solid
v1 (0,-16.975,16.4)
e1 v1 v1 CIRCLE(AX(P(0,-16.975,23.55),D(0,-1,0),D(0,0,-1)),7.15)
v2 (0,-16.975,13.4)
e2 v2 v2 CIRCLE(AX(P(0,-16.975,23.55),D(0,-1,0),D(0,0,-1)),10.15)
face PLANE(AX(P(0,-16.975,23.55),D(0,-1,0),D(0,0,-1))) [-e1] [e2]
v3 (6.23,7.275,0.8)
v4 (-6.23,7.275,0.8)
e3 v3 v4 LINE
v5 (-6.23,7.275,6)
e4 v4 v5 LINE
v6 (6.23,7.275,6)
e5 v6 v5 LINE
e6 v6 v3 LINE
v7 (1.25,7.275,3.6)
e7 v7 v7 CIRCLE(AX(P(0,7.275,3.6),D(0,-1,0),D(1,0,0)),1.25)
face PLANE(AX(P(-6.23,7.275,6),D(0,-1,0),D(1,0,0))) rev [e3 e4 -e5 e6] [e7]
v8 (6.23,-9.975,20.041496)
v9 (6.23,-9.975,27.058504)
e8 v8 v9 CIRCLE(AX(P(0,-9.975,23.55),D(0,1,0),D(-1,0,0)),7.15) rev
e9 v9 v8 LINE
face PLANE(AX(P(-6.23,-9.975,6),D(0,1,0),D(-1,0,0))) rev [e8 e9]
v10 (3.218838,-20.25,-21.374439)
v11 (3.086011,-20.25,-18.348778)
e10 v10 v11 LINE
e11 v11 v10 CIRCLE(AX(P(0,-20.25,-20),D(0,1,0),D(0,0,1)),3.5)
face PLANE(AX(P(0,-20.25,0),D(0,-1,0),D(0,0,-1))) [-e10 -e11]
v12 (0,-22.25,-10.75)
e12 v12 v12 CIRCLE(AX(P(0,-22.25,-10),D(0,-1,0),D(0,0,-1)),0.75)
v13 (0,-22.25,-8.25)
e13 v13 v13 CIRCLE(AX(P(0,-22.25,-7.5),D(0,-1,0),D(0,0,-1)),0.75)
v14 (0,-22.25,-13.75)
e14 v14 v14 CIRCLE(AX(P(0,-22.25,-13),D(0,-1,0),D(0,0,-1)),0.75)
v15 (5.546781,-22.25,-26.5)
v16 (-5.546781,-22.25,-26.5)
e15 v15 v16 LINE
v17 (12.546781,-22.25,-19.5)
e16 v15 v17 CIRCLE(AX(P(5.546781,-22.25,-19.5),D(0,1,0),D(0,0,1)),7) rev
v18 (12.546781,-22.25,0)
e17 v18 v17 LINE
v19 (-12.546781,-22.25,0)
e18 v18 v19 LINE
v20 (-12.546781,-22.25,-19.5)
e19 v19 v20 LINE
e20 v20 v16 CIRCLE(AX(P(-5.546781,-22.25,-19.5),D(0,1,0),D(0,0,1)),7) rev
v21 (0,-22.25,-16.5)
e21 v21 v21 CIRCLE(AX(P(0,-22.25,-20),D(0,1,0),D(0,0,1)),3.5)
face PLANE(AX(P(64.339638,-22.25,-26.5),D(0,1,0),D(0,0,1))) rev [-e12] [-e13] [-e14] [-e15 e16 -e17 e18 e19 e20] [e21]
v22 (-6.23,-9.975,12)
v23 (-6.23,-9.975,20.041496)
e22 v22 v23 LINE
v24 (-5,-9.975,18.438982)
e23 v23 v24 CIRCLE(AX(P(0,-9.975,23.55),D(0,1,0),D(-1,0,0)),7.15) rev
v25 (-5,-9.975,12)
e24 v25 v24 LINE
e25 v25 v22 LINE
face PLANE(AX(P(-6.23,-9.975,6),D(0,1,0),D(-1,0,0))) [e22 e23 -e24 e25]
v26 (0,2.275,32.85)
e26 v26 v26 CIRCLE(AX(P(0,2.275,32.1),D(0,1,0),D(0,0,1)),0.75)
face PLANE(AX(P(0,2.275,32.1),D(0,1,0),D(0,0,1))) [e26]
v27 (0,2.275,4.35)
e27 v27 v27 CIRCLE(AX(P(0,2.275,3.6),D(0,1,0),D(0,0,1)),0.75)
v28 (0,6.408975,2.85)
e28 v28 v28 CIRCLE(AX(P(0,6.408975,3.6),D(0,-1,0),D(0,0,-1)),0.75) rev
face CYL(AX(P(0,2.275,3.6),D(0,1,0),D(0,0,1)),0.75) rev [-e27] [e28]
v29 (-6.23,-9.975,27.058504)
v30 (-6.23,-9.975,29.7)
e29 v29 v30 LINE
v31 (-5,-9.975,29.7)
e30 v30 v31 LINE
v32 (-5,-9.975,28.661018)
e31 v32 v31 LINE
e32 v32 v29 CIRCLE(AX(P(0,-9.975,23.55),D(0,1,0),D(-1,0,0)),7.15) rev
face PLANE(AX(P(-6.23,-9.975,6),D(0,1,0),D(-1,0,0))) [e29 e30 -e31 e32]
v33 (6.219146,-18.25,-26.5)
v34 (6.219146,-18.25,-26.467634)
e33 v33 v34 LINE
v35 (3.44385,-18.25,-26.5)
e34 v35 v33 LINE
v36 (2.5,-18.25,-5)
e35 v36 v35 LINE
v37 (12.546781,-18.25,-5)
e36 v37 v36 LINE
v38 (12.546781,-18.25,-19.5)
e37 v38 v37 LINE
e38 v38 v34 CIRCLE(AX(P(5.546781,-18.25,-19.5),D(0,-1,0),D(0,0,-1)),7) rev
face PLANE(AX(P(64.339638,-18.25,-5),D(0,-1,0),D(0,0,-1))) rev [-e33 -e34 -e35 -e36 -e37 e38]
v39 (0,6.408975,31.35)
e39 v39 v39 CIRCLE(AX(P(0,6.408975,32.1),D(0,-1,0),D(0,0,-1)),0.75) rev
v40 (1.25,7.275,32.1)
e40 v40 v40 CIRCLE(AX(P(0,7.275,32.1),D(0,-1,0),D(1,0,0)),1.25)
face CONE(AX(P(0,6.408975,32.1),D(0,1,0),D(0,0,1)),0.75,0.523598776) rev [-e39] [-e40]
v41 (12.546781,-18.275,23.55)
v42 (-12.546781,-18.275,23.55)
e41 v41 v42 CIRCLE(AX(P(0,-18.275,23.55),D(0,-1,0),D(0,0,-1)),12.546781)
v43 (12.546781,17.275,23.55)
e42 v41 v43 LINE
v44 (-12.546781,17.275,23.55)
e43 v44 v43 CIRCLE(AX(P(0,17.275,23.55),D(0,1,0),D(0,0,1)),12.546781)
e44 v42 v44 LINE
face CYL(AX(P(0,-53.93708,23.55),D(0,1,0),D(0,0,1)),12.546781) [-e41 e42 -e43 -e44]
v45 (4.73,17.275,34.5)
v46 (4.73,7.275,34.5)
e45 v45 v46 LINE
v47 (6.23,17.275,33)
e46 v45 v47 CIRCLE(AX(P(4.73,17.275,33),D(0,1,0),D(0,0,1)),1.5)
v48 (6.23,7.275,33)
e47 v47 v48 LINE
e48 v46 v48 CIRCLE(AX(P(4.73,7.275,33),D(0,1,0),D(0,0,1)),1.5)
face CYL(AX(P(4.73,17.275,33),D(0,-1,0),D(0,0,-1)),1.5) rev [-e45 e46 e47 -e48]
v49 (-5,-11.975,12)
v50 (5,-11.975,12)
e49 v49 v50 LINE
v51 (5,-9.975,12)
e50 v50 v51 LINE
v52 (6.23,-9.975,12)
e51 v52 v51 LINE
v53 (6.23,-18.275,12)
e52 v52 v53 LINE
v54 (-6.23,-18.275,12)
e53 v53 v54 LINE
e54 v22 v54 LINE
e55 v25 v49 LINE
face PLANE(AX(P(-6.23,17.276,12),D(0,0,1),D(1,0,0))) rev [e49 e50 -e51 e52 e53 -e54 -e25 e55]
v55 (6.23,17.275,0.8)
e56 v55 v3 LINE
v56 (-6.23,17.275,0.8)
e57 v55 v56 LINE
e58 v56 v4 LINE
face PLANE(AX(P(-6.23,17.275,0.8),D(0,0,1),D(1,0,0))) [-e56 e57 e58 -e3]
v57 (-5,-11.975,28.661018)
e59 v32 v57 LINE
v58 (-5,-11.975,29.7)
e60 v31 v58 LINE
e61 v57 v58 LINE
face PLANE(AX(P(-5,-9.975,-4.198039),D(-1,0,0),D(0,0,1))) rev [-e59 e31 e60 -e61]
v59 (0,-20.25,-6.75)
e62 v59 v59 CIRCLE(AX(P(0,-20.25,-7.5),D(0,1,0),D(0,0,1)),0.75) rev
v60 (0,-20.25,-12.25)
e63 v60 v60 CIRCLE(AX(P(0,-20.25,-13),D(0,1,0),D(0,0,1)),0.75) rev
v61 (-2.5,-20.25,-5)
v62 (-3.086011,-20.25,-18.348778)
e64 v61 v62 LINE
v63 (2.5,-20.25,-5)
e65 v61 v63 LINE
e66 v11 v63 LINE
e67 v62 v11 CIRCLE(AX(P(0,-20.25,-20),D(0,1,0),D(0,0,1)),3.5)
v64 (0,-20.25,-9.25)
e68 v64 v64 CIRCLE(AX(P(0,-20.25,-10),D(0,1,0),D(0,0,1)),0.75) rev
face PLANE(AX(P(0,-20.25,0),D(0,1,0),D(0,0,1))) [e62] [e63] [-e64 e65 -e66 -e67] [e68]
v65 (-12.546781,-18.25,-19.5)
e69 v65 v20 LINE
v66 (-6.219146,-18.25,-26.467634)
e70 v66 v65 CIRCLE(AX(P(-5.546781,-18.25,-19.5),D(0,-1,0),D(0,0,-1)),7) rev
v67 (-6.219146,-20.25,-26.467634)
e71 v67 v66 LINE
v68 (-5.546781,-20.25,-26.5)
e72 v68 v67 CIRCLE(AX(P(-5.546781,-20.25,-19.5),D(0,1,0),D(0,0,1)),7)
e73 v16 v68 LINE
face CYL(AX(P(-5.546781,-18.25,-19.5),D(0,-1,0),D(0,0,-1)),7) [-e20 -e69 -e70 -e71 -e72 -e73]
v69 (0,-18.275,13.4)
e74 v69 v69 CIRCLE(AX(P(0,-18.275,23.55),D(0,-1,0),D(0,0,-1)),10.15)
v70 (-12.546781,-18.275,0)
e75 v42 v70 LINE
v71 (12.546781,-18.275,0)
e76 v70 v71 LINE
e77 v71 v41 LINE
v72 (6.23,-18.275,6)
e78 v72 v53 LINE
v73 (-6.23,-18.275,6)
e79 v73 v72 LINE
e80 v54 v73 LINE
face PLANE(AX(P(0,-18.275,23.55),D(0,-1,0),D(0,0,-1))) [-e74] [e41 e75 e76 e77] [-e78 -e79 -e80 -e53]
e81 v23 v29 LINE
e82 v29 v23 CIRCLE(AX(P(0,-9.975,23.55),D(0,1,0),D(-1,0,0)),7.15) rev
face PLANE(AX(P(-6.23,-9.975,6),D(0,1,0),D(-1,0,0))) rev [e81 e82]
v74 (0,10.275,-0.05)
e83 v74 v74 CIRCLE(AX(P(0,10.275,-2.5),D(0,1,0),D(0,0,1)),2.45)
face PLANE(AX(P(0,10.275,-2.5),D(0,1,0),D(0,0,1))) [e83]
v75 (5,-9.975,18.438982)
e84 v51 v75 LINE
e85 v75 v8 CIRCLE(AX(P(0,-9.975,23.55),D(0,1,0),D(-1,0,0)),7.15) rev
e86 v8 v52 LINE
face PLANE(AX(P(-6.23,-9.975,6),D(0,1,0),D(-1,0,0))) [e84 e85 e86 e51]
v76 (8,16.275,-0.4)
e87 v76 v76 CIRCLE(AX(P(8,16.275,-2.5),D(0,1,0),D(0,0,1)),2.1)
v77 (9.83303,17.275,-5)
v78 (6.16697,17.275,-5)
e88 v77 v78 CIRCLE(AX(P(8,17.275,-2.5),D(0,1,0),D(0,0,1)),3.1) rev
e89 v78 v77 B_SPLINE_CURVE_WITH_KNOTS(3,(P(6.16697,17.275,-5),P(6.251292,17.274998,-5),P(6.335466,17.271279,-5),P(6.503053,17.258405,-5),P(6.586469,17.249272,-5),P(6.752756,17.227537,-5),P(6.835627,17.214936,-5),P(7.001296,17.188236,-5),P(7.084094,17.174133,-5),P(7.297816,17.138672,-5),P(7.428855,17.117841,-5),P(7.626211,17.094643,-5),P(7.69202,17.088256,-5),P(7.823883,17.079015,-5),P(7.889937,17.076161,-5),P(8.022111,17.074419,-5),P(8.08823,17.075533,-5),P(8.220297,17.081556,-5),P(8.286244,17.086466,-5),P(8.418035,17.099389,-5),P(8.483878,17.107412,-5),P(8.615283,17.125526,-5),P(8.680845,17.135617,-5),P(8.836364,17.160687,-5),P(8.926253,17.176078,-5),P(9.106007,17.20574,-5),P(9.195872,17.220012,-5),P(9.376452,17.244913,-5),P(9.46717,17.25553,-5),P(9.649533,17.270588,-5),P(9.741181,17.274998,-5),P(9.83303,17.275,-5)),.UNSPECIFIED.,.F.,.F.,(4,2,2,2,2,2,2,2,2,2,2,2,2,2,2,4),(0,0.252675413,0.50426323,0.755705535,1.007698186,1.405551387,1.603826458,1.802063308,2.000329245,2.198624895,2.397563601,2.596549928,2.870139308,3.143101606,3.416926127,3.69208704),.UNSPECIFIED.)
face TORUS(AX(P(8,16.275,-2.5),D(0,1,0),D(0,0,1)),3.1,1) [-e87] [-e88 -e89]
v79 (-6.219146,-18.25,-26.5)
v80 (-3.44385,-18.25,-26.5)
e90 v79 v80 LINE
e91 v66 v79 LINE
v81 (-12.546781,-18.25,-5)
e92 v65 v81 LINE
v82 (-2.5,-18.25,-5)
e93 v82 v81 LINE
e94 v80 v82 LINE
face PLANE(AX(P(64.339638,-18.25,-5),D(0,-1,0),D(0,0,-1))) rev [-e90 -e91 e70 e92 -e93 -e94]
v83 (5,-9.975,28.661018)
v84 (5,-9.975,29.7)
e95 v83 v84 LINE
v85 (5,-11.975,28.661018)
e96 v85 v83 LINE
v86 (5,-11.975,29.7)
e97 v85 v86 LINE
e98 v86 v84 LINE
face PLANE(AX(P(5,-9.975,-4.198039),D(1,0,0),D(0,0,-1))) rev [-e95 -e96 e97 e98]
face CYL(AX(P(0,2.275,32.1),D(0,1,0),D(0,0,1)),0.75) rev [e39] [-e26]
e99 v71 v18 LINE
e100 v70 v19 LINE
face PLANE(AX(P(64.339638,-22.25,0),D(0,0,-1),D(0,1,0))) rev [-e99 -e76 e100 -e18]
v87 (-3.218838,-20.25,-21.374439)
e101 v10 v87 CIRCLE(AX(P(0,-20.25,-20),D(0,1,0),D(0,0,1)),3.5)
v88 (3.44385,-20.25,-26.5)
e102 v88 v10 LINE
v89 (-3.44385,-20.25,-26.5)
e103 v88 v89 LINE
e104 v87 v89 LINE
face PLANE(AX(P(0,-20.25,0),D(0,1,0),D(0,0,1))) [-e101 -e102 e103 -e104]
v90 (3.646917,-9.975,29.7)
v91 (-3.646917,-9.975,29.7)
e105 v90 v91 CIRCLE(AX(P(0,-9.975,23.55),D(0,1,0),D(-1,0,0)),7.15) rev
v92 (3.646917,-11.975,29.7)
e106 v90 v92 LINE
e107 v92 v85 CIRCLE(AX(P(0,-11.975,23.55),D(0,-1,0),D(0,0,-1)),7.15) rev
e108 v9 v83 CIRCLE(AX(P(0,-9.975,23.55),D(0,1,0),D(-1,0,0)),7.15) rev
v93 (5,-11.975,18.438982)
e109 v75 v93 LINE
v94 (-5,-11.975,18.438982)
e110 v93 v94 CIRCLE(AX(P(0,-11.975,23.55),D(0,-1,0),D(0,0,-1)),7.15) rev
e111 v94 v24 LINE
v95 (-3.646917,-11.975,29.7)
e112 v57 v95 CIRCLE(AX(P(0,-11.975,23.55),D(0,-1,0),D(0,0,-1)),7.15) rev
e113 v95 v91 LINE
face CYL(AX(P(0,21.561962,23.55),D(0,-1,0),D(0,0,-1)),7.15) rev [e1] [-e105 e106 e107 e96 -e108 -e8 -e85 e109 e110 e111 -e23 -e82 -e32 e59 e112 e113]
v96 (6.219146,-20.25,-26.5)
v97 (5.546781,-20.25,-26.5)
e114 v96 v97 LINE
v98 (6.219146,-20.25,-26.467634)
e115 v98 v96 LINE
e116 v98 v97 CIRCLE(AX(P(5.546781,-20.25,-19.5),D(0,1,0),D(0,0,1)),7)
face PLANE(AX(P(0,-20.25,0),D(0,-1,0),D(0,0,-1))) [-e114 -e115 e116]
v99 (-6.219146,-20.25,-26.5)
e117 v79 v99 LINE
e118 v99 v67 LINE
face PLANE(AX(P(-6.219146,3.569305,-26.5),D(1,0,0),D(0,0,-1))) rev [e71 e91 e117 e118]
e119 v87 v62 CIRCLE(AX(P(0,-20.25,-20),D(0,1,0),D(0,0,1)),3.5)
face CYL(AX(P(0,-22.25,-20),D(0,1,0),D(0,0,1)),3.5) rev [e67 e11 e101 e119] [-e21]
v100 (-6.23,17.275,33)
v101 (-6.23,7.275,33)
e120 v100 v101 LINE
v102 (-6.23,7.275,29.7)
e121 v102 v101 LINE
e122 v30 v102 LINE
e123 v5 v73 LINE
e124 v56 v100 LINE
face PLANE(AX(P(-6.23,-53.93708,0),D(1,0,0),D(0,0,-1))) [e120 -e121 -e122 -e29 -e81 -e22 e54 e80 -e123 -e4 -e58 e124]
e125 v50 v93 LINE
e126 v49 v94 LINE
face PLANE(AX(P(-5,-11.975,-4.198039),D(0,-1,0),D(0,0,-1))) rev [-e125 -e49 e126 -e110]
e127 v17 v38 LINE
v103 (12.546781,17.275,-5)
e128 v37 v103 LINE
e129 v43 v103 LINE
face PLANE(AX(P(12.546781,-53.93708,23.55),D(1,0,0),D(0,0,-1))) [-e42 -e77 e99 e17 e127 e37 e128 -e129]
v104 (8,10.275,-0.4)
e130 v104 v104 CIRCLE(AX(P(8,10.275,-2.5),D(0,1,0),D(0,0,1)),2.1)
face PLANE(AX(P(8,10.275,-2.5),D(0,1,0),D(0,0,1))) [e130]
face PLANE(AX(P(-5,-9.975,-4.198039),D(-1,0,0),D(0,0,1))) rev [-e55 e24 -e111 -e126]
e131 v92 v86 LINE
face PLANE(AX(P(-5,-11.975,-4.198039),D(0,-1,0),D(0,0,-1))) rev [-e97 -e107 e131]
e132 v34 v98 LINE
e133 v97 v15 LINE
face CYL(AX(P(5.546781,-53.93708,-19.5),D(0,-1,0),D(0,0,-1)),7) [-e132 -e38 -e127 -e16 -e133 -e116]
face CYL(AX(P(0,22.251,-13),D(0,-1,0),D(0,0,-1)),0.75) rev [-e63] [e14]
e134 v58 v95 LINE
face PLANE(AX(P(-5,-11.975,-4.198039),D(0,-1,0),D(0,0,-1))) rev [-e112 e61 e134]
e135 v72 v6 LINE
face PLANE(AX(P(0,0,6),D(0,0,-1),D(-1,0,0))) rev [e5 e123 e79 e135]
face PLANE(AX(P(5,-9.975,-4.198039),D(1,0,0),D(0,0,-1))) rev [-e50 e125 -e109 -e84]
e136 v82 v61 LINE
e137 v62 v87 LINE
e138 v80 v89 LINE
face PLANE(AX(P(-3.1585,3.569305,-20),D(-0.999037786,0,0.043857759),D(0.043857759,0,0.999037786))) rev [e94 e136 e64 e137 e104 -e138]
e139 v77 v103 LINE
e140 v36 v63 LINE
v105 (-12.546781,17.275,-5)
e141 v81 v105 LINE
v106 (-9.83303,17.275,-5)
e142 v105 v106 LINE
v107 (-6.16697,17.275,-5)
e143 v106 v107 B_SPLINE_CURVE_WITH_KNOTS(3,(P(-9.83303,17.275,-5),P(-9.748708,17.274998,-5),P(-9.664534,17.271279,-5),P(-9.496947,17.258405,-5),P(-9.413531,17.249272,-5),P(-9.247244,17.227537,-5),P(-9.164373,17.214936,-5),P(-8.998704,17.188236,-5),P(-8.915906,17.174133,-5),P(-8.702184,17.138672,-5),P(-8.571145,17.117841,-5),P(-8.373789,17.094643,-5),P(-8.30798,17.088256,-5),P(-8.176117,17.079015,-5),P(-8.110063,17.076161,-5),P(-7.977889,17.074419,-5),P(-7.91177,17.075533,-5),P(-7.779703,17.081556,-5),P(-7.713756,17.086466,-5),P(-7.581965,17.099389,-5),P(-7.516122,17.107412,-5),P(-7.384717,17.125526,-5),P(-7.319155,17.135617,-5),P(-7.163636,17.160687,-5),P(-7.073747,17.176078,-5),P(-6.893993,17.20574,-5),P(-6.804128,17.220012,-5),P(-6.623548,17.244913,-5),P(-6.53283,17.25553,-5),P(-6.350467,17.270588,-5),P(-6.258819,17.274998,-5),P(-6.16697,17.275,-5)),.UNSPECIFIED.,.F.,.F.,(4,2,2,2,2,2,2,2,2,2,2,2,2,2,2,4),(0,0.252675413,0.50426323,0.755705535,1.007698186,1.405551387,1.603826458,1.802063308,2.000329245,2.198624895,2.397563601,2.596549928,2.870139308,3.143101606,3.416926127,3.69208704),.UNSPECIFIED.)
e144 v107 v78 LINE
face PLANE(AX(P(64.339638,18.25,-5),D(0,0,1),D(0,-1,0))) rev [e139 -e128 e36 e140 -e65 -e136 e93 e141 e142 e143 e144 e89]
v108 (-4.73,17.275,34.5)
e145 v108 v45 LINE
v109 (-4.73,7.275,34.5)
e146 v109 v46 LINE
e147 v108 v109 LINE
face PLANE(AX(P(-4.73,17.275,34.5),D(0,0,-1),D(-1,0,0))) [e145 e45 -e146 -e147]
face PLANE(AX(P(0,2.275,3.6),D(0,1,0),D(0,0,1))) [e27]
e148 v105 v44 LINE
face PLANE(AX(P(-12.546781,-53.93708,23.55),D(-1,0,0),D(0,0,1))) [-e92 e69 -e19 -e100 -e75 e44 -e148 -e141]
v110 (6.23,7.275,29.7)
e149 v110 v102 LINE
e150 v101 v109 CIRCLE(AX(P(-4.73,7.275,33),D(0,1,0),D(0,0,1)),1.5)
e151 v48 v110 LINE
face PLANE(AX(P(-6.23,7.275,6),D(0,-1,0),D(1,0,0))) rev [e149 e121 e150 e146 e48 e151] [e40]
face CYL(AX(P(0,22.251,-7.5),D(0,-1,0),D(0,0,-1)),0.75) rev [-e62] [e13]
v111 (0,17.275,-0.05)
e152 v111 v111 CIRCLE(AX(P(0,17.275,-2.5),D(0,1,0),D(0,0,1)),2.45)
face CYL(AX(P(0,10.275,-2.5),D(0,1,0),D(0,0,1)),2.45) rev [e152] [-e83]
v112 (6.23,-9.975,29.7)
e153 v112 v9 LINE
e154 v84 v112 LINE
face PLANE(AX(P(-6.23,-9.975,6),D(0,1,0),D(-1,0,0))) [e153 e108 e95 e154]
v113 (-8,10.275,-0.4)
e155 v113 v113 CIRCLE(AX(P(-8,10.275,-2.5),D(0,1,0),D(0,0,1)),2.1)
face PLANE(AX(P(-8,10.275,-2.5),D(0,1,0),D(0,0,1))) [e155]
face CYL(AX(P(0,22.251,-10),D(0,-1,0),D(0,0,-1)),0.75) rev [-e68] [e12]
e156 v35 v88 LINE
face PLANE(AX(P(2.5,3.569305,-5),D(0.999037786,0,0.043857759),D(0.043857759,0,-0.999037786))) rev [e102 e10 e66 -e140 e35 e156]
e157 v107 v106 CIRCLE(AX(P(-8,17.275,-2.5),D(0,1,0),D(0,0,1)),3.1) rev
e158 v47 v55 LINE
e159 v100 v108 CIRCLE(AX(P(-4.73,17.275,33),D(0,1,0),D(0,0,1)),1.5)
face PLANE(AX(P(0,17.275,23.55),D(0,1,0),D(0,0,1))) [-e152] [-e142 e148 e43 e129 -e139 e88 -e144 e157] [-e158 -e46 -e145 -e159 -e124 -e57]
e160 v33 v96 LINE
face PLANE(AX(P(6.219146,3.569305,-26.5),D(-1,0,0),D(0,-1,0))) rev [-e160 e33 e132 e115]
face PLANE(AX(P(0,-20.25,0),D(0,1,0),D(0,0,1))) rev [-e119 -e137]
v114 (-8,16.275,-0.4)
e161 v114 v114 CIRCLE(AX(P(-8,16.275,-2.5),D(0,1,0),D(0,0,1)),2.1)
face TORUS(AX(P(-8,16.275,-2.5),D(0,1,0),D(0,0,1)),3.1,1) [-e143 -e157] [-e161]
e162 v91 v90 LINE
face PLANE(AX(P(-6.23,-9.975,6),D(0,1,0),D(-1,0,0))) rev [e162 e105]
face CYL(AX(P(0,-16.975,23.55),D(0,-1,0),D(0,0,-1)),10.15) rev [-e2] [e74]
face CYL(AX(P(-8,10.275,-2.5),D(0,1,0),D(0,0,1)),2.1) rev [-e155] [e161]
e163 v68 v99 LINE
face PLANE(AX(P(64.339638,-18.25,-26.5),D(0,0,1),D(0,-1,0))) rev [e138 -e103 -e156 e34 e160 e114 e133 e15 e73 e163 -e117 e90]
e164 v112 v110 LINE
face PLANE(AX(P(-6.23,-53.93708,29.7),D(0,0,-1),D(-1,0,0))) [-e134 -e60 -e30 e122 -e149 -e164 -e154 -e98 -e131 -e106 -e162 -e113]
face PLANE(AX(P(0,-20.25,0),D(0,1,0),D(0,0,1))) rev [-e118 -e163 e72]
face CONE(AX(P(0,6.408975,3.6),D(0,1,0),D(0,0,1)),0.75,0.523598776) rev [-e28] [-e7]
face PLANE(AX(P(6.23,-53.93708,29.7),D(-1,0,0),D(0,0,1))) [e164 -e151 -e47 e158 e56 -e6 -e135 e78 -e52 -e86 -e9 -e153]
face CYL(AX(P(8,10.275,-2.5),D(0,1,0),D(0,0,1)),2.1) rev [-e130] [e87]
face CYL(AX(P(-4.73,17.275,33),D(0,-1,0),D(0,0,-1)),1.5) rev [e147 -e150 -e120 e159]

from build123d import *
from OCP.BRepFilletAPI import BRepFilletAPI_MakeChamfer

# Parameters (mm, degrees)
SKETCH4_W                = 12.46
SKETCH4_H                = 17.25
BOSS_EXTRUDE3_DEPTH      = 6
BOSS_EXTRUDE6_DEPTH      = 8.3
BOSS_EXTRUDE6_DEPTH_BACK = 17.25
SKETCH8_R                = 12.546781182
SKETCH8_R_2              = 11.15
BOSS_EXTRUDE4_DEPTH      = 17.25
SKETCH6_R                = 0.75
CUT_EXTRUDE1_DEPTH       = 5
CHAMFER1_SIZE            = 0.5
CHAMFER1_SIZE2           = 0.866025404
SKETCH10_W               = 12.46
SKETCH10_H               = 23.7
CUT_EXTRUDE3_DEPTH       = 17.25
BOSS_EXTRUDE7_START      = -8.3
BOSS_EXTRUDE7_DEPTH      = 8.3
BOSS_EXTRUDE9_START      = 10
BOSS_EXTRUDE9_DEPTH      = 10
BOSS_EXTRUDE11_START     = -8.3
SKETCH20_R               = 11.15
SKETCH20_R_2             = 7.15
BOSS_EXTRUDE11_DEPTH     = 8.3
CUT_EXTRUDE7_START       = -1.3
SKETCH21_R               = 10.15
SKETCH21_R_2             = 7.15
CUT_EXTRUDE7_DEPTH       = 1.3
CUT_EXTRUDE4_REACH       = 39.061
SKETCH11_W               = 10
SKETCH11_H               = 2
CUT_EXTRUDE8_REACH       = 54.194
SKETCH24_W               = 12.46
SKETCH24_H               = 6
BOSS_EXTRUDE10_DEPTH     = 25.093562364
SKETCH18_W               = 21.5
SKETCH18_H               = 12.438292938
CUT_EXTRUDE5_DEPTH       = 2
CUT_EXTRUDE6_DEPTH       = 58.154608998
CUT_EXTRUDE6_DEPTH_BACK  = 58.154608998
SKETCH19_R               = 3.5
FILLET1_R                = 7
SKETCH22_R               = 6.5
BOSS_EXTRUDE12_DEPTH     = 5
SKETCH23_R               = 6.075
BOSS_EXTRUDE13_DEPTH     = 5
FILLET2_R                = 1
BOSS_EXTRUDE15_DEPTH     = 2
CUT_EXTRUDE9_REACH       = 60.657
SKETCH26_R               = 0.75
CUT_EXTRUDE10_DEPTH      = 50.271969555
SKETCH28_R               = 2.1
SKETCH28_R_2             = 2.45
CUT_EXTRUDE11_DEPTH      = 7
FILLET3_R                = 1


with BuildPart() as part:
    # Sketch4 → Boss-Extrude3 (new body)
    with BuildSketch(Plane.XY):
        with Locations((0, -1.35)):
            Rectangle(SKETCH4_W, SKETCH4_H)
    extrude(amount=BOSS_EXTRUDE3_DEPTH)



with BuildPart() as body_2:
    # Sketch8 → Boss-Extrude6 (new, two sides: drawn at the far end of the back side and taken through both)
    with BuildSketch(Plane(origin=(0, -9.975, 0), x_dir=(-1, 0, 0), z_dir=(0, -1, 0)).offset(-BOSS_EXTRUDE6_DEPTH_BACK)):
        with Locations(Location((0, -23.55, 0), (0, 0, 90))):
            Circle(SKETCH8_R)
        with Locations(Location((0, -23.55, 0), (0, 0, 90))):
            Circle(SKETCH8_R_2, mode=Mode.SUBTRACT)
    extrude(amount=BOSS_EXTRUDE6_DEPTH + BOSS_EXTRUDE6_DEPTH_BACK)


with BuildPart() as part_1:
    add(part.part)

    add(body_2.part)  # Boss-Extrude4 merges body 2
    # Sketch5 → Boss-Extrude4 (add)
    with BuildSketch(Plane(origin=(0, 7.275, 0), x_dir=(1, 0, 0), z_dir=(0, 1, 0))):
        with BuildLine():
            Line((12.546781182, -23.55), (12.546781182, 0))
            Line((12.546781182, 0), (6.23, 0))
            Line((6.23, 0), (6.23, -29.7))
            Line((6.23, -29.7), (-6.23, -29.7))
            Line((-6.23, -29.7), (-6.23, 0))
            Line((-6.23, 0), (-12.546781182, 0))
            Line((-12.546781182, 0), (-12.546781182, -23.55))
            ThreePointArc((-12.546781182, -23.55), (0, -36.096781182), (12.546781182, -23.55))
        make_face()
    extrude(amount=-BOSS_EXTRUDE4_DEPTH)

    # Sketch6 → Cut-Extrude1 (cut)
    with BuildSketch(Plane(origin=(0, 7.275, 0), x_dir=(1, 0, 0), z_dir=(0, 1, 0))):
        with Locations(Location((0, -3.6, 0), (0, 0, 270))):
            Circle(SKETCH6_R)
        with Locations(Location((0, -32.1, 0), (0, 0, 270))):
            Circle(SKETCH6_R)
    extrude(amount=-CUT_EXTRUDE1_DEPTH, mode=Mode.SUBTRACT)

    # Chamfer1: one chamfer whose edges measure the first distance from different faces: ONE call of the kernel's chamfer builder (chamfer() names one face for all edges)
    chamfer1_edges_1 = [part_1.edges().sort_by_distance(p)[0] for p in [
        (0, 7.275, 2.85),
    ]]
    chamfer1_side_1 = [part_1.faces().sort_by_distance(p)[0] for p in [
        (12.202646125, 7.275, 11.775),
    ]]
    chamfer1_edges_2 = [part_1.edges().sort_by_distance(p)[0] for p in [
        (0, 7.275, 31.35),
    ]]
    chamfer1_side_2 = [part_1.faces().sort_by_distance(p)[0] for p in [
        (6.532214051, 7.275, 22.001429951),
    ]]
    chamfer1 = BRepFilletAPI_MakeChamfer(part_1.part.solid().wrapped)
    for e in chamfer1_edges_1:
        chamfer1.Add(CHAMFER1_SIZE, CHAMFER1_SIZE2, e.wrapped, chamfer1_side_1[0].wrapped)  # the first distance lies on this face
    for e in chamfer1_edges_2:
        chamfer1.Add(CHAMFER1_SIZE, CHAMFER1_SIZE2, e.wrapped, chamfer1_side_2[0].wrapped)  # the first distance lies on this face
    add(Compound.cast(chamfer1.Shape()), mode=Mode.REPLACE)

    # Sketch10 → Cut-Extrude3 (cut)
    with BuildSketch(Plane(origin=(0, 7.275, 0), x_dir=(1, 0, 0), z_dir=(0, 1, 0))):
        with Locations((0, -17.85)):
            Rectangle(SKETCH10_W, SKETCH10_H)
    extrude(amount=-CUT_EXTRUDE3_DEPTH, mode=Mode.SUBTRACT)

    # Sketch13 → Boss-Extrude7 (add)
    with BuildSketch(Plane.XZ.offset(18.275).offset(BOSS_EXTRUDE7_START)):
        with BuildLine():
            Line((-12.546781182, 23.55), (-12.546781182, 0))
            Line((-12.546781182, 0), (12.546781182, 0))
            Line((12.546781182, 0), (12.546781182, 23.55))
            ThreePointArc((12.546781182, 23.55), (0, 11.003218818), (-12.546781182, 23.55))
        make_face()
    extrude(amount=BOSS_EXTRUDE7_DEPTH)

    # Sketch15 → Boss-Extrude9 (add)
    with BuildSketch(Plane(origin=(0, 7.275, 0), x_dir=(1, 0, 0), z_dir=(0, 1, 0)).offset(BOSS_EXTRUDE9_START)):
        with BuildLine():
            Line((-12.546781182, 0), (12.546781182, 0))
            Line((12.546781182, 0), (12.546781182, -23.55))
            ThreePointArc((12.546781182, -23.55), (0, -36.096781182), (-12.546781182, -23.55))
            Line((-12.546781182, -23.55), (-12.546781182, 0))
        make_face()
        with BuildLine():
            Line((-6.23, -0.8), (6.23, -0.8))
            Line((6.23, -0.8), (6.23, -33))
            ThreePointArc((6.23, -33), (5.790660172, -34.060660172), (4.73, -34.5))
            Line((4.73, -34.5), (-4.73, -34.5))
            ThreePointArc((-4.73, -34.5), (-5.790660172, -34.060660172), (-6.23, -33))
            Line((-6.23, -33), (-6.23, -0.8))
        make_face(mode=Mode.SUBTRACT)
    extrude(amount=-BOSS_EXTRUDE9_DEPTH)

    # Sketch20 → Boss-Extrude11 (add)
    with BuildSketch(Plane.XZ.offset(18.275).offset(BOSS_EXTRUDE11_START)):
        with Locations((0, 23.55)):
            Circle(SKETCH20_R)
        with Locations(Location((0, 23.55, 0), (0, 0, 270))):
            Circle(SKETCH20_R_2, mode=Mode.SUBTRACT)
    extrude(amount=BOSS_EXTRUDE11_DEPTH)

    # Sketch21 → Cut-Extrude7 (cut)
    with BuildSketch(Plane.XZ.offset(18.275).offset(CUT_EXTRUDE7_START)):
        with Locations(Location((0, 23.55, 0), (0, 0, 270))):
            Circle(SKETCH21_R)
        with Locations(Location((0, 23.55, 0), (0, 0, 270))):
            Circle(SKETCH21_R_2, mode=Mode.SUBTRACT)
    extrude(amount=CUT_EXTRUDE7_DEPTH, mode=Mode.SUBTRACT)

    # Cut-Extrude4: up to this face of the body (flat: up to its plane)
    cut_extrude4_end = Plane(part_1.part.faces().sort_by_distance((0, -1.35, 6))[0])
    # Sketch11 → Cut-Extrude4 (cut, up to the picked face)
    with BuildSketch(Plane.XY.offset(29.7), mode=Mode.PRIVATE) as cut_extrude4_sk1:
        with Locations((0, -10.975)):
            Rectangle(SKETCH11_W, SKETCH11_H)
    cut_extrude4_tool1 = split(extrude(cut_extrude4_sk1.sketch, amount=-CUT_EXTRUDE4_REACH, mode=Mode.PRIVATE), bisect_by=cut_extrude4_end, keep=Keep.BOTH, mode=Mode.PRIVATE)
    add(cut_extrude4_tool1.solids().sort_by(Axis((0, -10.975, 29.7), (0, 0, -1)))[0], mode=Mode.SUBTRACT)

    # Sketch24 → Cut-Extrude8 (cut, up to next)
    with BuildSketch(Plane.XZ.offset(18.275), mode=Mode.PRIVATE) as cut_extrude8_sk1:
        with Locations((0, 9)):
            Rectangle(SKETCH24_W, SKETCH24_H)
    cut_extrude8_tool1 = extrude(cut_extrude8_sk1.sketch, amount=-CUT_EXTRUDE8_REACH, mode=Mode.PRIVATE) & part_1.part
    add(cut_extrude8_tool1.solids().sort_by_distance((0, -18.275, 9))[0], mode=Mode.SUBTRACT)

    # Sketch17 → Boss-Extrude10 (add)
    with BuildSketch(Plane(origin=(-12.546781182, 4.728218818, 0), x_dir=(0, -1, 0), z_dir=(1, 0, 0))):
        Polygon((26.978218818, 26.5), (26.978218818, 0), (-17.521781182, 0), (-17.521781182, 26.5), (-13.521781182, 26.5), (-13.521781182, 5), (22.978218818, 5), (22.978218818, 26.5), align=None)
    extrude(amount=BOSS_EXTRUDE10_DEPTH)

    # Sketch18 → Cut-Extrude5 (cut)
    with BuildSketch(Plane.ZX.offset(-18.25)):
        with Locations((-15.75, 0)):
            Rectangle(SKETCH18_W, SKETCH18_H)
    extrude(amount=-CUT_EXTRUDE5_DEPTH, mode=Mode.SUBTRACT)

    # Sketch19 → Cut-Extrude6 (cut, two sides: drawn at the far end of the back side and taken through both)
    with BuildSketch(Plane.ZX.offset(-20.25).offset(-CUT_EXTRUDE6_DEPTH_BACK)):
        with Locations((-20, 0)):
            Circle(SKETCH19_R)
    extrude(amount=CUT_EXTRUDE6_DEPTH + CUT_EXTRUDE6_DEPTH_BACK, mode=Mode.SUBTRACT)

    # Fillet1
    fillet1_edges = [part_1.edges().sort_by_distance(p)[0] for p in [
        (12.546781182, -20.25, -26.5),
        (-12.546781182, -20.25, -26.5),
        (12.546781182, 20.25, -26.5),
        (-12.546781182, 20.25, -26.5),
    ]]
    fillet(fillet1_edges, radius=FILLET1_R)

    # Sketch22 → Boss-Extrude12 (add)
    with BuildSketch(Plane(origin=(0, 22.25, 0), x_dir=(1, 0, 0), z_dir=(0, 1, 0))):
        with Locations(Location((0, 20, 0), (0, 0, 270))):
            Circle(SKETCH22_R)
    extrude(amount=-BOSS_EXTRUDE12_DEPTH)

    # Sketch23 → Boss-Extrude13 (add)
    with BuildSketch(Plane.XZ.offset(-17.25)):
        with Locations(Location((0, -20, 0), (0, 0, 270))):
            Circle(SKETCH23_R)
    extrude(amount=BOSS_EXTRUDE13_DEPTH)

    # Fillet2
    fillet2_edges = [part_1.edges().sort_by_distance(p)[0] for p in [
        (0, 12.25, -13.925),
    ]]
    fillet(fillet2_edges, radius=FILLET2_R)

    # Sketch25 → Boss-Extrude15 (add)
    with BuildSketch(Plane(origin=(0, -20.25, 0), x_dir=(1, 0, 0), z_dir=(0, 1, 0))):
        Polygon((-6.219146469, 5), (-2.5, 5), (-3.1585, 20), (-3.44385, 26.5), (-6.219146469, 26.5), align=None)
        Polygon((6.219146469, 5), (2.5, 5), (3.1585, 20), (3.44385, 26.5), (6.219146469, 26.5), align=None)
    extrude(amount=BOSS_EXTRUDE15_DEPTH)

    # Sketch26 → Cut-Extrude9 (cut, up to next)
    with BuildSketch(Plane(origin=(0, -22.25, 0), x_dir=(-1, 0, 0), z_dir=(0, -1, 0)), mode=Mode.PRIVATE) as cut_extrude9_sk1:
        with Locations(Location((0, 10, 0), (0, 0, 90))):
            Circle(SKETCH26_R)
    cut_extrude9_tool1 = extrude(cut_extrude9_sk1.sketch, amount=-CUT_EXTRUDE9_REACH, mode=Mode.PRIVATE) & part_1.part
    # Sketch26 → Cut-Extrude9 (cut, up to next)
    with BuildSketch(Plane(origin=(0, -22.25, 0), x_dir=(-1, 0, 0), z_dir=(0, -1, 0)), mode=Mode.PRIVATE) as cut_extrude9_sk2:
        with Locations(Location((0, 13, 0), (0, 0, 90))):
            Circle(SKETCH26_R)
    cut_extrude9_tool2 = extrude(cut_extrude9_sk2.sketch, amount=-CUT_EXTRUDE9_REACH, mode=Mode.PRIVATE) & part_1.part
    # Sketch26 → Cut-Extrude9 (cut, up to next)
    with BuildSketch(Plane(origin=(0, -22.25, 0), x_dir=(-1, 0, 0), z_dir=(0, -1, 0)), mode=Mode.PRIVATE) as cut_extrude9_sk3:
        with Locations(Location((0, 7.5, 0), (0, 0, 90))):
            Circle(SKETCH26_R)
    cut_extrude9_tool3 = extrude(cut_extrude9_sk3.sketch, amount=-CUT_EXTRUDE9_REACH, mode=Mode.PRIVATE) & part_1.part
    add(cut_extrude9_tool1.solids().sort_by_distance((0, -22.25, -10))[0], mode=Mode.SUBTRACT)
    add(cut_extrude9_tool2.solids().sort_by_distance((0, -22.25, -13))[0], mode=Mode.SUBTRACT)
    add(cut_extrude9_tool3.solids().sort_by_distance((0, -22.25, -7.5))[0], mode=Mode.SUBTRACT)

    # Sketch27 → Cut-Extrude10 (cut, through all)
    with BuildSketch(Plane.ZY.offset(12.546781182)):
        Polygon((-26.5, 22.25), (0, 22.25), (0, 17.275), (-10.361855954, 17.275), (-10.361855954, 7.850012942), (-26.5, 7.850012942), align=None)
    extrude(amount=-CUT_EXTRUDE10_DEPTH, mode=Mode.SUBTRACT)

    # Sketch28 → Cut-Extrude11 (cut)
    with BuildSketch(Plane(origin=(0, 17.275, 0), x_dir=(1, 0, 0), z_dir=(0, 1, 0))):
        with Locations(Location((-8, 2.5, 0), (0, 0, 270))):
            Circle(SKETCH28_R)
        with Locations(Location((8, 2.5, 0), (0, 0, 270))):
            Circle(SKETCH28_R)
        with Locations(Location((0, 2.5, 0), (0, 0, 270))):
            Circle(SKETCH28_R_2)
    extrude(amount=-CUT_EXTRUDE11_DEPTH, mode=Mode.SUBTRACT)

    # Fillet3
    # the kernel refuses this fillet: 1 mm, written as the material it takes off along each edge
    with BuildSketch(Plane(origin=(-8, 17.275, -2.5), x_dir=(0, 0, 1), z_dir=(-1, 0, 0))) as fillet3_piece_1:
        with BuildLine():
            CenterArc((2.1 + FILLET3_R, -FILLET3_R), FILLET3_R, 90, 90)
            Line((2.1, -FILLET3_R), (2.1, 0))
            Line((2.1, 0), (2.1 + FILLET3_R, 0))
        make_face()
    revolve(axis=Axis((-8, 17.275, -2.5), (0, 1, 0)), mode=Mode.SUBTRACT)
    with BuildSketch(Plane(origin=(8, 17.275, -2.5), x_dir=(0, 0, 1), z_dir=(-1, 0, 0))) as fillet3_piece_2:
        with BuildLine():
            CenterArc((2.1 + FILLET3_R, -FILLET3_R), FILLET3_R, 90, 90)
            Line((2.1, -FILLET3_R), (2.1, 0))
            Line((2.1, 0), (2.1 + FILLET3_R, 0))
        make_face()
    revolve(axis=Axis((8, 17.275, -2.5), (0, 1, 0)), mode=Mode.SUBTRACT)


solid = part_1.part
